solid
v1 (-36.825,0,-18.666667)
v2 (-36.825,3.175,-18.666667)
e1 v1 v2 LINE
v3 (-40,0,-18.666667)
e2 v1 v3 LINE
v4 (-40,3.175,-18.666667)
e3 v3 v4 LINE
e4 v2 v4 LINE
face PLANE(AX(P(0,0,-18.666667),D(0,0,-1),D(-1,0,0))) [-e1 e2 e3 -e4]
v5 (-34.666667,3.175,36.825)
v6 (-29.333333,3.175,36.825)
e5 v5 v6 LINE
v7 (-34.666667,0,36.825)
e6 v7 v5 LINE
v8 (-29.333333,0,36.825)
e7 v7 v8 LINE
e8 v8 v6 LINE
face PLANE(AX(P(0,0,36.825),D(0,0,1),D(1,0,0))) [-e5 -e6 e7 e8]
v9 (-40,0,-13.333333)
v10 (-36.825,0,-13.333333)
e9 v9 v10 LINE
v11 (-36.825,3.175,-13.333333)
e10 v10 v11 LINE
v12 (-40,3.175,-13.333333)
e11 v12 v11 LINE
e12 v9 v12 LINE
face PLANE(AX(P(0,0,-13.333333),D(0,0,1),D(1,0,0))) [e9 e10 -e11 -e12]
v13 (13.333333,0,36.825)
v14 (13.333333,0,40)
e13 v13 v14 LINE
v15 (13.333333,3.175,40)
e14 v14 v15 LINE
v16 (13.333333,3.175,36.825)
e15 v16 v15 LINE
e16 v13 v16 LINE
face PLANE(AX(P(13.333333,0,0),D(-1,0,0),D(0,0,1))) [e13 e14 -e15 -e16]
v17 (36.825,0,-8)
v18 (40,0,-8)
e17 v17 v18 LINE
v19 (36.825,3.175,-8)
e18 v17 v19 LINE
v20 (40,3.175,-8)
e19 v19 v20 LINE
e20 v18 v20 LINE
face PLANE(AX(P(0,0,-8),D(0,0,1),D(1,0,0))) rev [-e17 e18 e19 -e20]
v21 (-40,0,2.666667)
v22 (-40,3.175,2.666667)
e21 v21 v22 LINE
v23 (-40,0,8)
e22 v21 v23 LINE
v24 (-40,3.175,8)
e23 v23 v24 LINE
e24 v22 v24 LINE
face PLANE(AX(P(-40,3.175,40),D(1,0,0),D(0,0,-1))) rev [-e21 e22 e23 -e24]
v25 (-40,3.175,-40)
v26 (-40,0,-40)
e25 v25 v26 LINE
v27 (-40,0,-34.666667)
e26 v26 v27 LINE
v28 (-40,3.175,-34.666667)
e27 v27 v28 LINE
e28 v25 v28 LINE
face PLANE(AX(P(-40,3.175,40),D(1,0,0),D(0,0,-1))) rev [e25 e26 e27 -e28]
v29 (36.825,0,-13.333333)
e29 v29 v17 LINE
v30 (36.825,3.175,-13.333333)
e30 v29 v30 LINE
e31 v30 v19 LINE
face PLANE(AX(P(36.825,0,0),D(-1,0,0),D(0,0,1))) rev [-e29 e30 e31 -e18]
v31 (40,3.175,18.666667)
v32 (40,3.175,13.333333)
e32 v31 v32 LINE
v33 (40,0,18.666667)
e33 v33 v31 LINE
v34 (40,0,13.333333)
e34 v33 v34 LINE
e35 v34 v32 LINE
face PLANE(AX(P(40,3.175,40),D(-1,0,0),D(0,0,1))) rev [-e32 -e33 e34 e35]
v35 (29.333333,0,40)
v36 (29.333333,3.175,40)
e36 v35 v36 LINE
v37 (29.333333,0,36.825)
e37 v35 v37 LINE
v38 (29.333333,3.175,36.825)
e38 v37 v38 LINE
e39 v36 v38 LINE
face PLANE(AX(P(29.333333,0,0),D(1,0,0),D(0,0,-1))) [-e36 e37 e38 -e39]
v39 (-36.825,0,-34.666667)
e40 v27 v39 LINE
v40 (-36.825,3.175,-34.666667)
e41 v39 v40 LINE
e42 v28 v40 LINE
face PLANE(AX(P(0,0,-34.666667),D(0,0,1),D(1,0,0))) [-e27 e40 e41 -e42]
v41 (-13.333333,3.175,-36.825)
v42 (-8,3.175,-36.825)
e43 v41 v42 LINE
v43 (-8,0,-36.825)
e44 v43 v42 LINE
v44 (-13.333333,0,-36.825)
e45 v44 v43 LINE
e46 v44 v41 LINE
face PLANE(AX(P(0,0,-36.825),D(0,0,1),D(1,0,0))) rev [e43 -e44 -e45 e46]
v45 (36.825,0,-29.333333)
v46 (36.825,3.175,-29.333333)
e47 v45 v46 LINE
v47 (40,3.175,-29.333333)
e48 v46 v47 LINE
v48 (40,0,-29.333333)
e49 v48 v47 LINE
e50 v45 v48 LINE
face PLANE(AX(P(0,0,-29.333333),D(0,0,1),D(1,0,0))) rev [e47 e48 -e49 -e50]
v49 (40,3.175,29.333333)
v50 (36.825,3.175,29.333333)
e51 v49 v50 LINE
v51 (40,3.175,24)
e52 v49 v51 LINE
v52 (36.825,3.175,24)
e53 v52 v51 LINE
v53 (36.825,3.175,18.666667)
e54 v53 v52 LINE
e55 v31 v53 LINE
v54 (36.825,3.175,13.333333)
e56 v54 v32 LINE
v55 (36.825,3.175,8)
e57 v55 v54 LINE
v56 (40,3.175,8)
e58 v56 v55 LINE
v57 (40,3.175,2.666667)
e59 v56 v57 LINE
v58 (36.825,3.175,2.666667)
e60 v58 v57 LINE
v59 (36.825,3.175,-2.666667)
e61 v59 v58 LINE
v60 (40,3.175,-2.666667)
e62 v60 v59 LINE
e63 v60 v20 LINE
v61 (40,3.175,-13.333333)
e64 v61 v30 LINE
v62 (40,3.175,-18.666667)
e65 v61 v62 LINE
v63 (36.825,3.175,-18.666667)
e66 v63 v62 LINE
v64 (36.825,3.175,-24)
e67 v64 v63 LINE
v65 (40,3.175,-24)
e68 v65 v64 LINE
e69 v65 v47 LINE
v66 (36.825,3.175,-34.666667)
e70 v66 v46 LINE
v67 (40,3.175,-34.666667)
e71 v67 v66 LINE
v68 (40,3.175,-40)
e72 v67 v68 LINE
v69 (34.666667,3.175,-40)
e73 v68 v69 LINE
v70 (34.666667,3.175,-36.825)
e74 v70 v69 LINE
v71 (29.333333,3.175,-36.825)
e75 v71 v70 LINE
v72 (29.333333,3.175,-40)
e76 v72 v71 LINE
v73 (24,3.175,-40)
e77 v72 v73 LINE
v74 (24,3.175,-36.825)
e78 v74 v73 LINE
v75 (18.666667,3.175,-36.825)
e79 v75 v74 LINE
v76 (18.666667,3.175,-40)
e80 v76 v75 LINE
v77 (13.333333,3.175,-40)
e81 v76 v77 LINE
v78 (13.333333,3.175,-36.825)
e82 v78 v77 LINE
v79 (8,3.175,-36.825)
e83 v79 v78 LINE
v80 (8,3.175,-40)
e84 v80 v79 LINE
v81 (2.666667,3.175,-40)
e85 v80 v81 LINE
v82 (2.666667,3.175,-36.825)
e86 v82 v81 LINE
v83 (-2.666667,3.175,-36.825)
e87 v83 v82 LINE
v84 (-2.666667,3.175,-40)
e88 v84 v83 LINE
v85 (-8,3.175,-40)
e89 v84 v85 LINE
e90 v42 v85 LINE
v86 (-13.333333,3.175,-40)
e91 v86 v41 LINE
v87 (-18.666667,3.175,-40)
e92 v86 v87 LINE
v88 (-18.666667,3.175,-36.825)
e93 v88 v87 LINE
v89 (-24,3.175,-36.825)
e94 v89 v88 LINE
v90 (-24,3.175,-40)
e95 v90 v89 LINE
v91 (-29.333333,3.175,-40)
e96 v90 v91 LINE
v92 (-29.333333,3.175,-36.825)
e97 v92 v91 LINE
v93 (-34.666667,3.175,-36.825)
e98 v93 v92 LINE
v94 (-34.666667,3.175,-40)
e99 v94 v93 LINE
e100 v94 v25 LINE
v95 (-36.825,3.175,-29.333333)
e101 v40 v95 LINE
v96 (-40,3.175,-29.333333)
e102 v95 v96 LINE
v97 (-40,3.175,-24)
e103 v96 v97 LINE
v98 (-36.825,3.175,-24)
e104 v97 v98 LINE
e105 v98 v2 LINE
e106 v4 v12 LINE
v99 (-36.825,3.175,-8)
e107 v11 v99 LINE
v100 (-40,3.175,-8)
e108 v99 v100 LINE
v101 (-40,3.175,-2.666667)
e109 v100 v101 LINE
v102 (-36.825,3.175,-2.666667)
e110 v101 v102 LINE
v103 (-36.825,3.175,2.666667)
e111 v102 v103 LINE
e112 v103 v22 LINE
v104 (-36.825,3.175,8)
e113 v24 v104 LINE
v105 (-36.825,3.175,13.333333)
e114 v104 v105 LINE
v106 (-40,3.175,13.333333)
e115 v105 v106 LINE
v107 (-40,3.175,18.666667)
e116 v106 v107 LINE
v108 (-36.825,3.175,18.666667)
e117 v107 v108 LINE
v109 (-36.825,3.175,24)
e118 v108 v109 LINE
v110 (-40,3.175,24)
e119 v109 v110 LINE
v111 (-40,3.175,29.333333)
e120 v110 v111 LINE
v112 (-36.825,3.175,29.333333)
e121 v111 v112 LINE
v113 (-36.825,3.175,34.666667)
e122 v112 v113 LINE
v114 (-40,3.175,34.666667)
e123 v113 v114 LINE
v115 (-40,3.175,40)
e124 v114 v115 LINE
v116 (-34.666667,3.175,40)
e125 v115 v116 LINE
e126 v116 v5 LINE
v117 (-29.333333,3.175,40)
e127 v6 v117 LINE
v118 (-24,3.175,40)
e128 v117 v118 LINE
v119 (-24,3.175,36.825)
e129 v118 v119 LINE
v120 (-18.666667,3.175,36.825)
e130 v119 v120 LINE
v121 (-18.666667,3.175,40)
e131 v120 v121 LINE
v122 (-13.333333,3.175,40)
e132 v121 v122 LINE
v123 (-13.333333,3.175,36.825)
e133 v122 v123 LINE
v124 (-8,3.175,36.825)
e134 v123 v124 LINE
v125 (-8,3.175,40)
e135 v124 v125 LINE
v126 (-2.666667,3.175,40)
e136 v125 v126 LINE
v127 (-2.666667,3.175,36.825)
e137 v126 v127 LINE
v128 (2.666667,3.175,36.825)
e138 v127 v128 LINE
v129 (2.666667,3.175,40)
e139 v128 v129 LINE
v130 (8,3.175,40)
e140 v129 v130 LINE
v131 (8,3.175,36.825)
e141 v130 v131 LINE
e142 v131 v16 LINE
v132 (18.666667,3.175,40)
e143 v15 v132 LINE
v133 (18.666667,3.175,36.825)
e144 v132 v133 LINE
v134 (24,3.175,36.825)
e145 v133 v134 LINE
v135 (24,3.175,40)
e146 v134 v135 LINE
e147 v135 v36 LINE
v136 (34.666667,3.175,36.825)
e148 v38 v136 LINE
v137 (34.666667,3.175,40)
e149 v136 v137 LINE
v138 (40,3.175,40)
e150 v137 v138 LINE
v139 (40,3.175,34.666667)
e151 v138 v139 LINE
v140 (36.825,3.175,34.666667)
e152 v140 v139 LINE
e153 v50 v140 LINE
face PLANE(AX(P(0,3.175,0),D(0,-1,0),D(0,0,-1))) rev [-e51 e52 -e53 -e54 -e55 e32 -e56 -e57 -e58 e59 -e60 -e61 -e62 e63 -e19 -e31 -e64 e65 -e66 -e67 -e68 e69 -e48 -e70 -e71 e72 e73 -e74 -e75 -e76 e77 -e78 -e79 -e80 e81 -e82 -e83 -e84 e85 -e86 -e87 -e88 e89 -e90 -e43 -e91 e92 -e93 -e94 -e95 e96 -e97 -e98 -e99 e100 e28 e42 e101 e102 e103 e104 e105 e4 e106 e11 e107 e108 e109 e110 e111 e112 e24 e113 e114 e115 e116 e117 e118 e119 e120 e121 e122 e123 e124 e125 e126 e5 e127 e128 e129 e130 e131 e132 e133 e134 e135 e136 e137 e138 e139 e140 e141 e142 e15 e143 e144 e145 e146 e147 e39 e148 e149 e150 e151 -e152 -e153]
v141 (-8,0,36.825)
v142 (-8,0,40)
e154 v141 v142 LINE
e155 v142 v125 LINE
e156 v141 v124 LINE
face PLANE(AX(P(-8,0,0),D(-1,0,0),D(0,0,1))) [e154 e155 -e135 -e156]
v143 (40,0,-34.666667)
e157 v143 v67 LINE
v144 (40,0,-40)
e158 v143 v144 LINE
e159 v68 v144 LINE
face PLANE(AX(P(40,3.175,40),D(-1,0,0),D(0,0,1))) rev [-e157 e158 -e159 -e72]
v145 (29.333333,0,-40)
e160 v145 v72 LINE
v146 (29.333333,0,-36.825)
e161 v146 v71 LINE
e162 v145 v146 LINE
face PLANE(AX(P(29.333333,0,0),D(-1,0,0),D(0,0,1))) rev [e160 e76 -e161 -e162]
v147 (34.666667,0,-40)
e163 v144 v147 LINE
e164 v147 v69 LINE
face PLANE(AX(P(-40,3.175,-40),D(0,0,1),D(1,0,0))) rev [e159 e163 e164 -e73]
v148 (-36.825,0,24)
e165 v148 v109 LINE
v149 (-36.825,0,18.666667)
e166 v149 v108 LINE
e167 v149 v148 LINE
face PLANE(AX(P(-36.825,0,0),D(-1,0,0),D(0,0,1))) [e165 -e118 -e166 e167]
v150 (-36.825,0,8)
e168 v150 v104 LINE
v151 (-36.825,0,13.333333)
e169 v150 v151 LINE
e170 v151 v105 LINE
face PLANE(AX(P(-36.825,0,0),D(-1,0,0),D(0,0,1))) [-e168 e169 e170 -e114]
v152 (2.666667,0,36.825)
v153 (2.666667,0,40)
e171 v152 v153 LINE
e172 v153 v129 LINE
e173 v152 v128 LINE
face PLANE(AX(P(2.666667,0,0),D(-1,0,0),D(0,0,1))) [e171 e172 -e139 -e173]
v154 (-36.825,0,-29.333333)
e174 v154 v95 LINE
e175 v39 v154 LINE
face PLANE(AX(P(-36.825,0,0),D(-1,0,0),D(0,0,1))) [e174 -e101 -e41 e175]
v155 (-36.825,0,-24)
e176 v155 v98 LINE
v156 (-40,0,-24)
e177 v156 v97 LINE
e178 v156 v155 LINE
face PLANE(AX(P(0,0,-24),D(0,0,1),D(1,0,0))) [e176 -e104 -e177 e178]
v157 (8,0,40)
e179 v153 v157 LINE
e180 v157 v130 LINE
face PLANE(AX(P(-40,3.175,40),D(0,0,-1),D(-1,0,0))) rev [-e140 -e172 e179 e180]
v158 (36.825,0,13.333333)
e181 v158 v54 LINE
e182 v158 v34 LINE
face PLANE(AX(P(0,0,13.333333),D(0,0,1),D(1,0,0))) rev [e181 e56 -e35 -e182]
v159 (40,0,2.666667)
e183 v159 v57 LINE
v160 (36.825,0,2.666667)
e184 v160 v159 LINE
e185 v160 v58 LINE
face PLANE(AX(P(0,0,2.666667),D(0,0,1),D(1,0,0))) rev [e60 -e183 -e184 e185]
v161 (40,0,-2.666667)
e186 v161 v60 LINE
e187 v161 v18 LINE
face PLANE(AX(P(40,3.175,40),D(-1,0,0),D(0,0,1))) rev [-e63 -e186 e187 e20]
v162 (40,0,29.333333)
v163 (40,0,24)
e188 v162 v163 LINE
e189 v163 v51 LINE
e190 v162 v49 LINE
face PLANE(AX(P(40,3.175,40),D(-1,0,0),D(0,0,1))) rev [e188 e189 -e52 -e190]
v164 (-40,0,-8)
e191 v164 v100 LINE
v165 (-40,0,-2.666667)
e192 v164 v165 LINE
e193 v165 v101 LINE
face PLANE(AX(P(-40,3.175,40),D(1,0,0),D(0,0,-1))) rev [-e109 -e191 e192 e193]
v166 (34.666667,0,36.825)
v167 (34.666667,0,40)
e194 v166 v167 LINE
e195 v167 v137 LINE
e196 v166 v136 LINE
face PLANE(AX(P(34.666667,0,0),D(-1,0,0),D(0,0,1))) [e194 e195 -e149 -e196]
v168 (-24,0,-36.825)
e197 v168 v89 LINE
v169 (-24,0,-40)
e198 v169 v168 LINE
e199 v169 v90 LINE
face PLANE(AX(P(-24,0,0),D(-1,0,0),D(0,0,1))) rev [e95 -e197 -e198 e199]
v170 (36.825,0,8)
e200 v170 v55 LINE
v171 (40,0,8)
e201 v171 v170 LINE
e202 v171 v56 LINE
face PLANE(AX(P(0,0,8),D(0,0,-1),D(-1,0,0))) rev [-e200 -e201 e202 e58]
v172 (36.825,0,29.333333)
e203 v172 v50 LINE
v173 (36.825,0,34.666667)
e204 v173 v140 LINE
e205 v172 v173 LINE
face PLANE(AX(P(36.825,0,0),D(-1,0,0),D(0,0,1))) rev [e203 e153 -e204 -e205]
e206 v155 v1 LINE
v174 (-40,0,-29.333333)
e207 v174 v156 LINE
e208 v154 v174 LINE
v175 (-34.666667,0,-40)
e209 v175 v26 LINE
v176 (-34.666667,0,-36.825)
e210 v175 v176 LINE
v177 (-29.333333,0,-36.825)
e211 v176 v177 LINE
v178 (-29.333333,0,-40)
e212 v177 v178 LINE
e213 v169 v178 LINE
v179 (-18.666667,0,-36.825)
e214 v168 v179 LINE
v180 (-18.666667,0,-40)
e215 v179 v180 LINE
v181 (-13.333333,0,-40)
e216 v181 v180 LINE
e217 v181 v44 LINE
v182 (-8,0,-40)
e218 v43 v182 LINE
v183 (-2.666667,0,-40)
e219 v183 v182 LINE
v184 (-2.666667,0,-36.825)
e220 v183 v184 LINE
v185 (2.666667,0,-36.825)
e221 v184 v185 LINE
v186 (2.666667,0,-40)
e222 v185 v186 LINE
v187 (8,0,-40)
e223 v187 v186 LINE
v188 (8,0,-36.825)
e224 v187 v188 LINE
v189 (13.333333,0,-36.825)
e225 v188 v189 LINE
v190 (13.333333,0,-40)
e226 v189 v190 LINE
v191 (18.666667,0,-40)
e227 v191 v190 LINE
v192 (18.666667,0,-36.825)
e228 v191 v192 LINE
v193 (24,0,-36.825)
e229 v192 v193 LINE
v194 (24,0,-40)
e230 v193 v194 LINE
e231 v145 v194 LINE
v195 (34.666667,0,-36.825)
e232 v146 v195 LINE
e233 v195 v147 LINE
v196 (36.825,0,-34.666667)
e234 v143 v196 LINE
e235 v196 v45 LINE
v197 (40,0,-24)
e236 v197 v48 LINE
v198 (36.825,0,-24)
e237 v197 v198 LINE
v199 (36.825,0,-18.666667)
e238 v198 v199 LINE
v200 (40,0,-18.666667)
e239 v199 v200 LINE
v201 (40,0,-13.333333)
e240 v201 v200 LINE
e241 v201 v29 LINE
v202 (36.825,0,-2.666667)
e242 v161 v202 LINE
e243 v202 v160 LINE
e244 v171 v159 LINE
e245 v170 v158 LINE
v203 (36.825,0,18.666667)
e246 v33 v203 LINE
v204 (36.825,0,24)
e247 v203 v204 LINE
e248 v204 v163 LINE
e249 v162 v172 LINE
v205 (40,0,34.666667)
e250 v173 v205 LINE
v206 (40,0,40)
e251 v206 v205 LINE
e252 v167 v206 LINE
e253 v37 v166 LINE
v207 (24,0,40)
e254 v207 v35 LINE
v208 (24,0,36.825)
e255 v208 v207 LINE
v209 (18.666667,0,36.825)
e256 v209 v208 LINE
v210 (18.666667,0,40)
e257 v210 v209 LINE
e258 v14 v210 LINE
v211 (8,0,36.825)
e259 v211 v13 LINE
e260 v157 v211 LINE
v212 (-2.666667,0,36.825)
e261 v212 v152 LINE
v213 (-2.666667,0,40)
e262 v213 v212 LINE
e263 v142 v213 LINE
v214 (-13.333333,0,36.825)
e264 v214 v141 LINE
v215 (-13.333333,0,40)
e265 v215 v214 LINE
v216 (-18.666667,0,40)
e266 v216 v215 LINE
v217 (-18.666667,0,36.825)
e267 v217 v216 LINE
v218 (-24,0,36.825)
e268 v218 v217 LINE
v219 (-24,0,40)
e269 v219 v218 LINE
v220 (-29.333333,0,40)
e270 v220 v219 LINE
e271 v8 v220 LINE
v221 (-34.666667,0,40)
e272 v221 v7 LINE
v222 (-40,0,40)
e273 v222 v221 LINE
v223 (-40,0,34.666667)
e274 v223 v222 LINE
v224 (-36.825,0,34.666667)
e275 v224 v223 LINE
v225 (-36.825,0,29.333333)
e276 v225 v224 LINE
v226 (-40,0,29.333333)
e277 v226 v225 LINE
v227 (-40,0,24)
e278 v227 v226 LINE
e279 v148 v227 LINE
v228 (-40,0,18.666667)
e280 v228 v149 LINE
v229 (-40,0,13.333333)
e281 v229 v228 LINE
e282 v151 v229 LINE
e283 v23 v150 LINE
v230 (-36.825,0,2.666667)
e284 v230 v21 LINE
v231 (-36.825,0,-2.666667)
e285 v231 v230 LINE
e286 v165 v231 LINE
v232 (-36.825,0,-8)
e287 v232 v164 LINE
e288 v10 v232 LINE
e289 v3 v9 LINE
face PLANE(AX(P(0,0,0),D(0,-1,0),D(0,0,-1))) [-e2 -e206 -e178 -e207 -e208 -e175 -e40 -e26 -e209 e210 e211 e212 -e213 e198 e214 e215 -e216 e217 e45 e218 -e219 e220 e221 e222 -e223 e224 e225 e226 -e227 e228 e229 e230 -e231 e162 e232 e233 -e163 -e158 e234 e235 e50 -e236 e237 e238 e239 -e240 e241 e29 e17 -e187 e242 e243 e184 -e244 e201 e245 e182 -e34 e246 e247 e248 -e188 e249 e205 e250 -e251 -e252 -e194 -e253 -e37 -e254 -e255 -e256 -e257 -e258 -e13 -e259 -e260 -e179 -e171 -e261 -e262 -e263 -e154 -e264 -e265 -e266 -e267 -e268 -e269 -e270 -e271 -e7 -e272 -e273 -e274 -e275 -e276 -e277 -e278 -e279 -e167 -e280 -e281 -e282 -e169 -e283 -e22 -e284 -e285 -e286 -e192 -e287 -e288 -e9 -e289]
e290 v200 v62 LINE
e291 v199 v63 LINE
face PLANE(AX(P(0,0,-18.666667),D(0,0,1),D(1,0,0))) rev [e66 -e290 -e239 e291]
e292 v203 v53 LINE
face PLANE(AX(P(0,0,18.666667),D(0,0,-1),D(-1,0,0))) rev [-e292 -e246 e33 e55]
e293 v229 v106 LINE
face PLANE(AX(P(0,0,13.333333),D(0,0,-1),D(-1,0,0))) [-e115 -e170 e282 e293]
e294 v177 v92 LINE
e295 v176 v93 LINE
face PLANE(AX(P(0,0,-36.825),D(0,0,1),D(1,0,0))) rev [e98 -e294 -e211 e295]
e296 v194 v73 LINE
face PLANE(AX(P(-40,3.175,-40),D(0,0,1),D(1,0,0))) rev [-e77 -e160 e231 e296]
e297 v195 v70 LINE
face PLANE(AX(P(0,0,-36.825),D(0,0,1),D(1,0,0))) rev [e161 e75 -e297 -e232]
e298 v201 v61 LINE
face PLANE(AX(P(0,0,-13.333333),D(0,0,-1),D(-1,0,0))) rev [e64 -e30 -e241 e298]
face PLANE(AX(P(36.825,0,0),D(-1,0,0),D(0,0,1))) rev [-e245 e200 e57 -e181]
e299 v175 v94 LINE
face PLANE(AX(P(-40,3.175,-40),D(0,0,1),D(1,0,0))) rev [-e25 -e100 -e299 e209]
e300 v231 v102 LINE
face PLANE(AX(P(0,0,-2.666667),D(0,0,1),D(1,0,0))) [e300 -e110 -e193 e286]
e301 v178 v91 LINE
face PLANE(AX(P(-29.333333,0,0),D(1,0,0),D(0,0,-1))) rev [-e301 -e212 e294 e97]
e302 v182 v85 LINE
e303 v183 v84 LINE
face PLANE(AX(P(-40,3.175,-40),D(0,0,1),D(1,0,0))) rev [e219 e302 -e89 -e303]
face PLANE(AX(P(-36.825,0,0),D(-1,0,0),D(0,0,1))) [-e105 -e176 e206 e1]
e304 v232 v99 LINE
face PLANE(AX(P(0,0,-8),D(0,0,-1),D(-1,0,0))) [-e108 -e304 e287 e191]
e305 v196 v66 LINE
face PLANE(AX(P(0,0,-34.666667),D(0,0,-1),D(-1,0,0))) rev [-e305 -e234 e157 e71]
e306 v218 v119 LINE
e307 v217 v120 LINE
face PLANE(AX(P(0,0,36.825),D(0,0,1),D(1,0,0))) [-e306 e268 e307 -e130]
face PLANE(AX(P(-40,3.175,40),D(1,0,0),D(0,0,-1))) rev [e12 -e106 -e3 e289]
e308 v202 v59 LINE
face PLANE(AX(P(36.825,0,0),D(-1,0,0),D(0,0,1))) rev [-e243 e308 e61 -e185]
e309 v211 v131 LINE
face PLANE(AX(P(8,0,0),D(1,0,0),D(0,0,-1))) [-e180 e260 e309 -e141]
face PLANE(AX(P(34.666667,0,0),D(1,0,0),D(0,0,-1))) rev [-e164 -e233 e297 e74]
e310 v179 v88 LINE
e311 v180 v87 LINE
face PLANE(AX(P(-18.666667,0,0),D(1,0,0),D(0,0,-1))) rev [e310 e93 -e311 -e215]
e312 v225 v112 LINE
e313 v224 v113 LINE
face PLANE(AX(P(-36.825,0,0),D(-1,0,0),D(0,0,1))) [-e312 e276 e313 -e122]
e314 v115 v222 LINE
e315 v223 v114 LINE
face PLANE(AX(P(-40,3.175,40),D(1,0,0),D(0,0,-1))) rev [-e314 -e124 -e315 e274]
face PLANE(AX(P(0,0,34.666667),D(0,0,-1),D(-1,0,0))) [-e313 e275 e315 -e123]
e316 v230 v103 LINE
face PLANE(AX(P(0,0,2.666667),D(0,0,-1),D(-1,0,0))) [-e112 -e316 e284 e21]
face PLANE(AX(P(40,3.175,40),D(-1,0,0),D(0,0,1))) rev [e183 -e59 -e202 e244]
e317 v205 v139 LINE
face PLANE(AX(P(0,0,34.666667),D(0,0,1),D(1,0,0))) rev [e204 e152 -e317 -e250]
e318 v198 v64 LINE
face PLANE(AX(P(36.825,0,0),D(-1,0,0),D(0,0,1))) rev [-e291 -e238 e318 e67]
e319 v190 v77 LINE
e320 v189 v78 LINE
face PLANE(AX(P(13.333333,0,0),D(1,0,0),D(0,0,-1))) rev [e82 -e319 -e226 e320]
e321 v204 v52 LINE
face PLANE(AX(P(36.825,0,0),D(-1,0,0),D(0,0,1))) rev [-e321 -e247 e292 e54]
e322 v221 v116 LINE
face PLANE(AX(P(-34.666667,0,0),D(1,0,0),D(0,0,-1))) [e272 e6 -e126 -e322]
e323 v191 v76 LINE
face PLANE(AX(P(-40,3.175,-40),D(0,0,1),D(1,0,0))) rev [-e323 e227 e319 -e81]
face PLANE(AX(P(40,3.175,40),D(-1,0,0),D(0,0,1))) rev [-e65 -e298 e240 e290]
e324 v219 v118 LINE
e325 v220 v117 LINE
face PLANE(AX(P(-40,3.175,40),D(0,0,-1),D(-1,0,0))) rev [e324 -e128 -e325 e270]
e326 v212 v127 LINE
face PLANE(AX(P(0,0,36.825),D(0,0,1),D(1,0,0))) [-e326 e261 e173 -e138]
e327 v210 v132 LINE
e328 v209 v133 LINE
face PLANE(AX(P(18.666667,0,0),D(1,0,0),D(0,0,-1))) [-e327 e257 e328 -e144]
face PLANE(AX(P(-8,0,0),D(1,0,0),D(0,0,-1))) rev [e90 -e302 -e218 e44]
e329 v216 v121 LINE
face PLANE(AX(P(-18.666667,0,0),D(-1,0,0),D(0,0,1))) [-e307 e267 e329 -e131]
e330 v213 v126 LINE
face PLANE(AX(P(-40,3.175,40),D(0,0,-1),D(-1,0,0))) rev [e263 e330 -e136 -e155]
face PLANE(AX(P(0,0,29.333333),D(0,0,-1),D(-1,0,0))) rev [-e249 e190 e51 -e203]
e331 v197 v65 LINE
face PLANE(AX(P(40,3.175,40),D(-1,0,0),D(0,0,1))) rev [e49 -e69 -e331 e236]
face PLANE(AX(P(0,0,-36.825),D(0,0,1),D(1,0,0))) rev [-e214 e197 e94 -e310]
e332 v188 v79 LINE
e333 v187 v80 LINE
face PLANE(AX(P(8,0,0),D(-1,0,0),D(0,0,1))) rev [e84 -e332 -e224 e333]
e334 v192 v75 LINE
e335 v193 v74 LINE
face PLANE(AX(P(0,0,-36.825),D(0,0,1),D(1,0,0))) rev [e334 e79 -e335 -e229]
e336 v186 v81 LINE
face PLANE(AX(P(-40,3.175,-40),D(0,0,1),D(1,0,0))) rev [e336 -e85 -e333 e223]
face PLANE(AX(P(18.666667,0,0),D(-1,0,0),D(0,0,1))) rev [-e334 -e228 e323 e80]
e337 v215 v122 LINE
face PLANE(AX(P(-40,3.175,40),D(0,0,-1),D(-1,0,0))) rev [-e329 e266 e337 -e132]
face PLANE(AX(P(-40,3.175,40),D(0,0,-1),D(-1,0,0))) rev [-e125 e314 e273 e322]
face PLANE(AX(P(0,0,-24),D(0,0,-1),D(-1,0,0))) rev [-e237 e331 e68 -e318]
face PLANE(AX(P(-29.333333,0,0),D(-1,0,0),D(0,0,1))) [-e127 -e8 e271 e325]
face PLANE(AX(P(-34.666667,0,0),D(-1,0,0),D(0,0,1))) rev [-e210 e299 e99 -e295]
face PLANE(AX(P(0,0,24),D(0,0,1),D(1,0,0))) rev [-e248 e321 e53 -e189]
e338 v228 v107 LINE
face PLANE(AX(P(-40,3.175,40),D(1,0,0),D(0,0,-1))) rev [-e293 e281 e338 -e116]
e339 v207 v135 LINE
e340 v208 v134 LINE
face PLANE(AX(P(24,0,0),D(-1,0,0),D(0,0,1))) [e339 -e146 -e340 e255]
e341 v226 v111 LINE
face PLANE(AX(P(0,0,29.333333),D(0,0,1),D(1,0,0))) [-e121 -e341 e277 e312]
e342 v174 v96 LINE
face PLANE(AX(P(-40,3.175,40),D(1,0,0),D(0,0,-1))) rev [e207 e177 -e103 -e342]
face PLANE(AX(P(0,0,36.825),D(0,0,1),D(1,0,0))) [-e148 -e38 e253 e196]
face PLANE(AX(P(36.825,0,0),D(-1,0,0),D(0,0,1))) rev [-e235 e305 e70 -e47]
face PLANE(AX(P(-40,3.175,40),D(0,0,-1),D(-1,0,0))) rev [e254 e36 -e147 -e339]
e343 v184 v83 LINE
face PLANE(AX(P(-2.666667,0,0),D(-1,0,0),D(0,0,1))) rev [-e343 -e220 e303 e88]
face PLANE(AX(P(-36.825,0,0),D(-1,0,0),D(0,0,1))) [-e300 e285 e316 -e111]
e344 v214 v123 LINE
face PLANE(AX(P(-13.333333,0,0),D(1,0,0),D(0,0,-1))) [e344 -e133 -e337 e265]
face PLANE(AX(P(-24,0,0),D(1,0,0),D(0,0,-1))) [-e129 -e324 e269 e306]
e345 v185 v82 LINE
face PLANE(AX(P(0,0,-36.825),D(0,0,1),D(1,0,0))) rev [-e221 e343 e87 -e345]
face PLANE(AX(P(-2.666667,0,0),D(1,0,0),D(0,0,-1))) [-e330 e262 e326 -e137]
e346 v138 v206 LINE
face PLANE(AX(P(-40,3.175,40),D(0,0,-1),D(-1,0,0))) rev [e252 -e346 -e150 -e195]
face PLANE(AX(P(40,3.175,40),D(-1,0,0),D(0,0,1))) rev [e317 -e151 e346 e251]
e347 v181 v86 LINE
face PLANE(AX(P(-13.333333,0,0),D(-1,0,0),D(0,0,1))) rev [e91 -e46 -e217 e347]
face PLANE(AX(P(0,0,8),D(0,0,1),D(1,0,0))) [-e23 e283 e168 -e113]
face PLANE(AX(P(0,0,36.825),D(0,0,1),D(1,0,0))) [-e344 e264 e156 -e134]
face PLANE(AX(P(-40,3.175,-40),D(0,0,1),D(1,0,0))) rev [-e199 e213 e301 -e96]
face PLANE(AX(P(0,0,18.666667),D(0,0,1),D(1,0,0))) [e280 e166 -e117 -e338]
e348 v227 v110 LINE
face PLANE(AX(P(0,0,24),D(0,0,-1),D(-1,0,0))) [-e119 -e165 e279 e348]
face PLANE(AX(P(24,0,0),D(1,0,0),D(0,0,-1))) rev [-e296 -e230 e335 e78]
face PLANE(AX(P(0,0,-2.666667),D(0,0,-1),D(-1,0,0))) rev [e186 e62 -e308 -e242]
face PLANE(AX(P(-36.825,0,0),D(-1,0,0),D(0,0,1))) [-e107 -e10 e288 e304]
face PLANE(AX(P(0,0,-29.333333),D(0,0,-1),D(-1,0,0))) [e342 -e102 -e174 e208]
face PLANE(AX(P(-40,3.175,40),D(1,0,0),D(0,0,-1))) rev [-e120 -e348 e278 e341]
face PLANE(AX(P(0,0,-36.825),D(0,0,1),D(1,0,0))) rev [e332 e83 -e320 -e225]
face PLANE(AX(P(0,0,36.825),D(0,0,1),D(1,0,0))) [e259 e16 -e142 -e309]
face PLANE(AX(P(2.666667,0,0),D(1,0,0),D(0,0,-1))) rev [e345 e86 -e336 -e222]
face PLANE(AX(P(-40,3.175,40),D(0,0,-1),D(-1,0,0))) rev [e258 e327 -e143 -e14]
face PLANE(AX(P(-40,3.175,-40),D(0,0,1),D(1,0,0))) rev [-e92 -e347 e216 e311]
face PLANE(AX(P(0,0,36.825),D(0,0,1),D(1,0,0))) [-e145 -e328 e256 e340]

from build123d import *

# Parameters (mm, degrees)
SKETCH1_W           = 80
SKETCH1_H           = 80
BOSS_EXTRUDE1_DEPTH = 3.175
SKETCH2_OUTSIDE_W   = 104.636
SKETCH2_OUTSIDE_H   = 104.636
CUT_EXTRUDE3_DEPTH  = 57.657573413


with BuildPart() as part:
    # Sketch1 → Boss-Extrude1 (new body)
    with BuildSketch(Plane(origin=(0, 0, 0), x_dir=(1, 0, 0), z_dir=(0, 1, 0))):
        Rectangle(SKETCH1_W, SKETCH1_H)
    extrude(amount=BOSS_EXTRUDE1_DEPTH)

    # Sketch2 outside → Cut-Extrude3 (cut, through all)
    with BuildSketch(Plane(origin=(0, 3.175, 0), x_dir=(1, 0, 0), z_dir=(0, 1, 0))):
        Rectangle(SKETCH2_OUTSIDE_W, SKETCH2_OUTSIDE_H)
        Polygon((-40, -40), (-34.666666667, -40), (-34.666666667, -36.825), (-29.333333333, -36.825), (-29.333333333, -40), (-24, -40), (-24, -36.825), (-18.666666667, -36.825), (-18.666666667, -40), (-13.333333333, -40), (-13.333333333, -36.825), (-8, -36.825), (-8, -40), (-2.666666667, -40), (-2.666666667, -36.825), (2.666666667, -36.825), (2.666666667, -40), (8, -40), (8, -36.825), (13.333333333, -36.825), (13.333333333, -40), (18.666666667, -40), (18.666666667, -36.825), (24, -36.825), (24, -40), (29.333333333, -40), (29.333333333, -36.825), (34.666666667, -36.825), (34.666666667, -40), (40, -40), (40, -34.666666667), (36.825, -34.666666667), (36.825, -29.333333333), (40, -29.333333333), (40, -24), (36.825, -24), (36.825, -18.666666667), (40, -18.666666667), (40, -13.333333333), (36.825, -13.333333333), (36.825, -8), (40, -8), (40, -2.666666667), (36.825, -2.666666667), (36.825, 2.666666667), (40, 2.666666667), (40, 8), (36.825, 8), (36.825, 13.333333333), (40, 13.333333333), (40, 18.666666667), (36.825, 18.666666667), (36.825, 24), (40, 24), (40, 29.333333333), (36.825, 29.333333333), (36.825, 34.666666667), (40, 34.666666667), (40, 40), (34.666666667, 40), (34.666666667, 36.825), (29.333333333, 36.825), (29.333333333, 40), (24, 40), (24, 36.825), (18.666666667, 36.825), (18.666666667, 40), (13.333333333, 40), (13.333333333, 36.825), (8, 36.825), (8, 40), (2.666666667, 40), (2.666666667, 36.825), (-2.666666667, 36.825), (-2.666666667, 40), (-8, 40), (-8, 36.825), (-13.333333333, 36.825), (-13.333333333, 40), (-18.666666667, 40), (-18.666666667, 36.825), (-24, 36.825), (-24, 40), (-29.333333333, 40), (-29.333333333, 36.825), (-34.666666667, 36.825), (-34.666666667, 40), (-40, 40), (-40, 34.666666667), (-36.825, 34.666666667), (-36.825, 29.333333333), (-40, 29.333333333), (-40, 24), (-36.825, 24), (-36.825, 18.666666667), (-40, 18.666666667), (-40, 13.333333333), (-36.825, 13.333333333), (-36.825, 8), (-40, 8), (-40, 2.666666667), (-36.825, 2.666666667), (-36.825, -2.666666667), (-40, -2.666666667), (-40, -8), (-36.825, -8), (-36.825, -13.333333333), (-40, -13.333333333), (-40, -18.666666667), (-36.825, -18.666666667), (-36.825, -24), (-40, -24), (-40, -29.333333333), (-36.825, -29.333333333), (-36.825, -34.666666667), (-40, -34.666666667), align=None, mode=Mode.SUBTRACT)
    extrude(amount=-CUT_EXTRUDE3_DEPTH, mode=Mode.SUBTRACT)


solid = part.part
